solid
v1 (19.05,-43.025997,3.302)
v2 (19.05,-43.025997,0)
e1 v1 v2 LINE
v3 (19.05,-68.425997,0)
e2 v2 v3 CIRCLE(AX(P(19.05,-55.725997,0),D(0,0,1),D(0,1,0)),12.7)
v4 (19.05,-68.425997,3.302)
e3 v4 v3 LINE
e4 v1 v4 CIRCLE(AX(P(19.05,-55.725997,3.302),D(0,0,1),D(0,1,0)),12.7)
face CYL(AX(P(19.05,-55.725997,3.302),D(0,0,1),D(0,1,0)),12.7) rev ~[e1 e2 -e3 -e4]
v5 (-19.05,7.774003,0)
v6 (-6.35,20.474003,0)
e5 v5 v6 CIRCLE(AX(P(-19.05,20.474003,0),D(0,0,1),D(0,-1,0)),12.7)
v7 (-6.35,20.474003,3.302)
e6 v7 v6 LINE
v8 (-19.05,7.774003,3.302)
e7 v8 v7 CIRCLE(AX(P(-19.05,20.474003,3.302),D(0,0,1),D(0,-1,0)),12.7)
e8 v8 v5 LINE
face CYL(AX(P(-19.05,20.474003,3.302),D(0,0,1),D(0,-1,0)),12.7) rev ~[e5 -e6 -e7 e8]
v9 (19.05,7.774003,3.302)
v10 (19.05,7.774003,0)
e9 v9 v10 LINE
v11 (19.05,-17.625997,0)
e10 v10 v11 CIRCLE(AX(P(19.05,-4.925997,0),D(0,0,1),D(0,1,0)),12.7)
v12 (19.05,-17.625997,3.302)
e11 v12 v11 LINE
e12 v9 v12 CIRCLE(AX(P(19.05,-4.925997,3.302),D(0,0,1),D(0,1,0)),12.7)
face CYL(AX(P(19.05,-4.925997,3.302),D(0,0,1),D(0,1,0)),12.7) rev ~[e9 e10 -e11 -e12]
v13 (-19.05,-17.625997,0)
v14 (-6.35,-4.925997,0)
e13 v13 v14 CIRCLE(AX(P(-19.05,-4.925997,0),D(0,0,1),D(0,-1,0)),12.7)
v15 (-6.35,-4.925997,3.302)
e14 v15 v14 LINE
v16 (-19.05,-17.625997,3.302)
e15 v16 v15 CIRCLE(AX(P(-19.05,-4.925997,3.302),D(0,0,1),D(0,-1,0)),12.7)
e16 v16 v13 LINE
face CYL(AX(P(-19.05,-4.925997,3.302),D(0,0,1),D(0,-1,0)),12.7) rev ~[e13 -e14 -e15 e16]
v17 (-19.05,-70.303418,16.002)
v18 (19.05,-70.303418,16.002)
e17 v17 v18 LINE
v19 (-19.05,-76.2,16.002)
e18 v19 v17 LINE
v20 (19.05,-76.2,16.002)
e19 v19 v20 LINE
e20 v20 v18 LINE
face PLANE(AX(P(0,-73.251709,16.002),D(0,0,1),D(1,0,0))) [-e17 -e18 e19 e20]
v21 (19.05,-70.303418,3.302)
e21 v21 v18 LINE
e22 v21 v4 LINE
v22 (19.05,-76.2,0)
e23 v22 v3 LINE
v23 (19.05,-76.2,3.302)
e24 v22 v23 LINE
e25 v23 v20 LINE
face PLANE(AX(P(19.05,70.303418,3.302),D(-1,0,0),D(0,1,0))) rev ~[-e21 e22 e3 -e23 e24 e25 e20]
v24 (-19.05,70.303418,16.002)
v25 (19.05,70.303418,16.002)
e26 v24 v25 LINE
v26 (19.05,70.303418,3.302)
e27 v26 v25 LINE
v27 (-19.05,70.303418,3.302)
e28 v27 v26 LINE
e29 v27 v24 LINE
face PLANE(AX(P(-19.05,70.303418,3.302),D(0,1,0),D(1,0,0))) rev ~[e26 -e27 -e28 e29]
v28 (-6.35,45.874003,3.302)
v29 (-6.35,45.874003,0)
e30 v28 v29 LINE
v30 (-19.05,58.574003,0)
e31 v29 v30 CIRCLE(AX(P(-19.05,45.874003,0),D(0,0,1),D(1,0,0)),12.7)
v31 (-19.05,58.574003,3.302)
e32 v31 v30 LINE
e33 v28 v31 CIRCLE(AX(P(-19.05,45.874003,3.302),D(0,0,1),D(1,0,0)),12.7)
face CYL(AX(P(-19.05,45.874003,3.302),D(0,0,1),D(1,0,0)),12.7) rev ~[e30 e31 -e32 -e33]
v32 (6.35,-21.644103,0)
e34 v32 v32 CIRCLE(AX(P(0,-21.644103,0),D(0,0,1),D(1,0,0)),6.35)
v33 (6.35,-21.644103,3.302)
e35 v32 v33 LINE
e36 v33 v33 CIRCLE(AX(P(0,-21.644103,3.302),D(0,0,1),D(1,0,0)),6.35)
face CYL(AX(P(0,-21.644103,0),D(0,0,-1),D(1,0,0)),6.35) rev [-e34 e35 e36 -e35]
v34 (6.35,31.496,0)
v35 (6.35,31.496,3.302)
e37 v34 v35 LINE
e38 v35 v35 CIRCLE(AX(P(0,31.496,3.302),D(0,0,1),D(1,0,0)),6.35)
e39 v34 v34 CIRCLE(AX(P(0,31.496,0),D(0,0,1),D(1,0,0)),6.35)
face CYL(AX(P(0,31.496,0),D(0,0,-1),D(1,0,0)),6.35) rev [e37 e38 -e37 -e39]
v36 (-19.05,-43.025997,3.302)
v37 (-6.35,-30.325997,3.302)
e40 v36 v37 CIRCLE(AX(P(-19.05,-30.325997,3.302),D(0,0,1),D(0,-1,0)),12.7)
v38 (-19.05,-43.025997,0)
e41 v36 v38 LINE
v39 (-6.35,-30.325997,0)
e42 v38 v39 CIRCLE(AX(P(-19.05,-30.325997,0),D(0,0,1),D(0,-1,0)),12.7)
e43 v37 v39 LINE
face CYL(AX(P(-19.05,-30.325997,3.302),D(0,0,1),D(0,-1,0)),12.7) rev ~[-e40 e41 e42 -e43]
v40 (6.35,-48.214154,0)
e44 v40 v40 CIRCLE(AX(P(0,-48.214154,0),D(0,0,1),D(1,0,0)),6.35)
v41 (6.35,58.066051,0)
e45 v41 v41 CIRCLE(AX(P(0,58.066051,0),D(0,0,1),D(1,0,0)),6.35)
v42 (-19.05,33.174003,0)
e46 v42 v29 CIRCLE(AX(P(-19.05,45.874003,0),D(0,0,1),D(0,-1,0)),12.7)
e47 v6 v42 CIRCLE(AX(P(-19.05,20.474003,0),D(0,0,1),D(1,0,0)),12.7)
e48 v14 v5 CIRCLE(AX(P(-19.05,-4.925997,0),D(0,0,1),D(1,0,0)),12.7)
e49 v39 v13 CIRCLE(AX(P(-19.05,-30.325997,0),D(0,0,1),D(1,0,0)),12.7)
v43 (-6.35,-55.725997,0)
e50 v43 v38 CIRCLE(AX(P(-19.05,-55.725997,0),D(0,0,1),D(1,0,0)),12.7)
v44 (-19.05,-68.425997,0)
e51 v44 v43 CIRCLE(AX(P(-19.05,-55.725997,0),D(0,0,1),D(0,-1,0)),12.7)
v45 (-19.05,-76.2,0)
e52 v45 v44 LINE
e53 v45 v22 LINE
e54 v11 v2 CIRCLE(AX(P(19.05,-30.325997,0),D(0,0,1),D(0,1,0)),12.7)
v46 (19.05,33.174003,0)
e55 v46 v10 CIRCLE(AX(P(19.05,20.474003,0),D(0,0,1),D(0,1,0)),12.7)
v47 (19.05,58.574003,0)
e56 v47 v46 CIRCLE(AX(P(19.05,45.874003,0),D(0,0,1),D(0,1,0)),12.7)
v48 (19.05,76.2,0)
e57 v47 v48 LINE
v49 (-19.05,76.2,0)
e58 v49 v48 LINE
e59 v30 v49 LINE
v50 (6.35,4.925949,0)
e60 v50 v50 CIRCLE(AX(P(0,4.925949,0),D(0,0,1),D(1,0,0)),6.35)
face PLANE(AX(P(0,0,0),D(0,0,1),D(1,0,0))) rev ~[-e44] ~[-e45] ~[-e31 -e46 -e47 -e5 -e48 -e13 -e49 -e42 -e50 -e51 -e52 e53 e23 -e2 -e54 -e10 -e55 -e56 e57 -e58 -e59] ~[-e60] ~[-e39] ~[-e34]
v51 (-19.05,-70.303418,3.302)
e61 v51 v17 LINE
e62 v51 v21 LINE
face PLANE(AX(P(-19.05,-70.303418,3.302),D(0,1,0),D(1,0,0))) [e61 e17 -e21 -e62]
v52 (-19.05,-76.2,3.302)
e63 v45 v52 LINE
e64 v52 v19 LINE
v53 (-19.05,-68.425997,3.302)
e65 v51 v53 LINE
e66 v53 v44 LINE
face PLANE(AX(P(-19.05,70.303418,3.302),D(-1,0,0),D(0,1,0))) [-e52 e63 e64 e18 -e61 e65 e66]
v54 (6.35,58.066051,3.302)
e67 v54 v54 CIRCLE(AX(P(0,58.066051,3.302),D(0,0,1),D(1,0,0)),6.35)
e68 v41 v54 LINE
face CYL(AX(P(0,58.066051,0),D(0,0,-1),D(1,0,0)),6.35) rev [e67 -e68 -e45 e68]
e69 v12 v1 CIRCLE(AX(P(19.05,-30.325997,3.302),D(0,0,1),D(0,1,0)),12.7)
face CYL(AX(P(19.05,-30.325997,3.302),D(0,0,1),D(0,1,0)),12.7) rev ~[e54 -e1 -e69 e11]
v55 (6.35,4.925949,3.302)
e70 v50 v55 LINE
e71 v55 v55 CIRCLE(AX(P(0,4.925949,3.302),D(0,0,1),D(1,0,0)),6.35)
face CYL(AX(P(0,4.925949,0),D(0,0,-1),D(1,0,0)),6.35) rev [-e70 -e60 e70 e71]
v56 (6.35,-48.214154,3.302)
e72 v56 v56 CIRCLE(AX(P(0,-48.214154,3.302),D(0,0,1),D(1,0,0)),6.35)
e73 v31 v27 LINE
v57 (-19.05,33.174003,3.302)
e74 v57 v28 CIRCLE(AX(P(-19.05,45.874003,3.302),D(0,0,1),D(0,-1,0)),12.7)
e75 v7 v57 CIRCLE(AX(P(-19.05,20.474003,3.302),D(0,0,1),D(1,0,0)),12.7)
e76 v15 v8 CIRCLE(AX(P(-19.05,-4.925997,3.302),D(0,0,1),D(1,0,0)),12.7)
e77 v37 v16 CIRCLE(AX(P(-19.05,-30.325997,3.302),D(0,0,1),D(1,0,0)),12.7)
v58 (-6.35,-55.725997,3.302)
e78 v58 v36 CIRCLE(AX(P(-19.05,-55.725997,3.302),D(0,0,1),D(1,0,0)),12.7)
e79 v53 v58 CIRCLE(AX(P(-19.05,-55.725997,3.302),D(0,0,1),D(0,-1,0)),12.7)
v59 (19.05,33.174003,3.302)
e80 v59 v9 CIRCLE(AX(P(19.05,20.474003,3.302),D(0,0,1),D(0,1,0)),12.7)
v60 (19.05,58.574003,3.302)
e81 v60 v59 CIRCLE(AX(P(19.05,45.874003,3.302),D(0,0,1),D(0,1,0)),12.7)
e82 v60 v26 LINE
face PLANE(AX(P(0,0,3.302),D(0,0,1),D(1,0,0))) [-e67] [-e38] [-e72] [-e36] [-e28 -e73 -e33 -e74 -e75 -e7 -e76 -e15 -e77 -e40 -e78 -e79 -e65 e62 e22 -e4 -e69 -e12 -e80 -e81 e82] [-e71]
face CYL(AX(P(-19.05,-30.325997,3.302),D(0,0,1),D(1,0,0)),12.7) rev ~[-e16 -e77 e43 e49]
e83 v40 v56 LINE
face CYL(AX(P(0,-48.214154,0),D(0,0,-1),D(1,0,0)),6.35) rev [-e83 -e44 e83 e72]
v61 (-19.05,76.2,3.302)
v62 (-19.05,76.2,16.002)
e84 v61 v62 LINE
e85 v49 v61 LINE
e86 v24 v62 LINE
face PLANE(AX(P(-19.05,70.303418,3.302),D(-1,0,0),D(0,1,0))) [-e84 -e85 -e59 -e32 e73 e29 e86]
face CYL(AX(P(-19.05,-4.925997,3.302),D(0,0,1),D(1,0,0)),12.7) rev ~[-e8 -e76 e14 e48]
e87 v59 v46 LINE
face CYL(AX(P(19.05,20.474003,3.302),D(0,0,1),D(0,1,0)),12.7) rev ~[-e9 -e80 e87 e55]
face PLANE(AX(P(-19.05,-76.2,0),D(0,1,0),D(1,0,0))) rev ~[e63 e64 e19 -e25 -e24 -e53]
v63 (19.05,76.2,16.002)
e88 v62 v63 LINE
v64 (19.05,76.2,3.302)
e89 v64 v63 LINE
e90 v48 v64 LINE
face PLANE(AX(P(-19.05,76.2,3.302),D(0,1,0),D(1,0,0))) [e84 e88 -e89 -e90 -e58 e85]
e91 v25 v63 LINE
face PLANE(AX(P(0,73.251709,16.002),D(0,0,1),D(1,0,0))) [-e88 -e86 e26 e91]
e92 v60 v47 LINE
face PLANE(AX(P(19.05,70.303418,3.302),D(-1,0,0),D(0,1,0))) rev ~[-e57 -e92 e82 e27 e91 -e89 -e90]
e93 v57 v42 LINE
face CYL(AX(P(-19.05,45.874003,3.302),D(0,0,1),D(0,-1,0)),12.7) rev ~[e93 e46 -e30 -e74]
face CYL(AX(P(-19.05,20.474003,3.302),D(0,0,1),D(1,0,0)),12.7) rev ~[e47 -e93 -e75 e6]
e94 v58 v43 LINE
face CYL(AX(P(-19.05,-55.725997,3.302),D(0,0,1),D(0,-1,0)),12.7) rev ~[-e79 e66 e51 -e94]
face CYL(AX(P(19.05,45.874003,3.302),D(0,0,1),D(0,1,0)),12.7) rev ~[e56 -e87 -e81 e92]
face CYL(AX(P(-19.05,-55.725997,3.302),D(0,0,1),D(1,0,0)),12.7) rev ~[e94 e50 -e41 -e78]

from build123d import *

# Parameters (mm, degrees)
F0_W     = 38.1
F0_H     = 152.4
F0_R     = 6.35
F1_DEPTH = 3.302
F2_W     = 38.1
F2_H     = 5.8965822577
F3_DEPTH = 12.7
F5_DEPTH = 25.4


with BuildPart() as f1:
    # F0 (on Top) → F1 (new body)
    with BuildSketch(Plane.XY):
        Rectangle(F0_W, F0_H)
        with Locations((0, -48.2141543601)):
            Circle(F0_R, mode=Mode.SUBTRACT)
        with Locations((0, -21.6441029067)):
            Circle(F0_R, mode=Mode.SUBTRACT)
        with Locations((0, 4.9259485466)):
            Circle(F0_R, mode=Mode.SUBTRACT)
        with Locations((0, 31.496)):
            Circle(F0_R, mode=Mode.SUBTRACT)
        with Locations((0, 58.0660514534)):
            Circle(F0_R, mode=Mode.SUBTRACT)
    extrude(amount=F1_DEPTH)

    # F2 (on face) → F3 (join)
    with BuildSketch(Plane.XY.offset(3.302)):
        with Locations((0, 73.2517088711)):
            Rectangle(F2_W, F2_H)
        with Locations((0, -73.2517088711)):
            Rectangle(F2_W, F2_H)
    extrude(amount=F3_DEPTH)

    # F4 (on face) → F5 (cut)
    with BuildSketch(Plane.XY.offset(3.302)):
        with BuildLine():
            ThreePointArc((-19.05, 33.1740033209), (-10.0697438789, 36.8937471999), (-6.35, 45.8740033209))
            ThreePointArc((-6.35, 45.8740033209), (-10.0697438789, 54.854259442), (-19.05, 58.5740033209))
            Line((-19.05, 58.5740033209), (-19.05, 33.1740033209))
        make_face()
        with BuildLine():
            ThreePointArc((-6.35, 20.4740033209), (-10.0697438789, 29.454259442), (-19.05, 33.1740033209))
            Line((-19.05, 33.1740033209), (-19.05, 7.7740033209))
            ThreePointArc((-19.05, 7.7740033209), (-10.0697438789, 11.4937471999), (-6.35, 20.4740033209))
        make_face()
        with BuildLine():
            ThreePointArc((-6.35, -4.9259966791), (-10.0697438789, 4.054259442), (-19.05, 7.7740033209))
            Line((-19.05, 7.7740033209), (-19.05, -17.6259966791))
            ThreePointArc((-19.05, -17.6259966791), (-10.0697438789, -13.9062528001), (-6.35, -4.9259966791))
        make_face()
        with BuildLine():
            ThreePointArc((-6.35, -30.3259966791), (-10.0697438789, -21.345740558), (-19.05, -17.6259966791))
            Line((-19.05, -17.6259966791), (-19.05, -43.0259966791))
            ThreePointArc((-19.05, -43.0259966791), (-10.0697438789, -39.3062528001), (-6.35, -30.3259966791))
        make_face()
        with BuildLine():
            Line((19.05, 33.1740033209), (19.05, 58.5740033209))
            ThreePointArc((19.05, 58.5740033209), (6.35, 45.8740033209), (19.05, 33.1740033209))
        make_face()
        with BuildLine():
            ThreePointArc((-6.35, -55.7259966791), (-10.0697438789, -46.745740558), (-19.05, -43.0259966791))
            Line((-19.05, -43.0259966791), (-19.05, -68.4259966791))
            ThreePointArc((-19.05, -68.4259966791), (-10.0697438789, -64.7062528001), (-6.35, -55.7259966791))
        make_face()
        with BuildLine():
            Line((19.05, 7.7740033209), (19.05, 33.1740033209))
            ThreePointArc((19.05, 33.1740033209), (6.35, 20.4740033209), (19.05, 7.7740033209))
        make_face()
        with BuildLine():
            Line((19.05, -17.6259966791), (19.05, 7.7740033209))
            ThreePointArc((19.05, 7.7740033209), (6.35, -4.9259966791), (19.05, -17.6259966791))
        make_face()
        with BuildLine():
            Line((19.05, -43.0259966791), (19.05, -17.6259966791))
            ThreePointArc((19.05, -17.6259966791), (6.35, -30.3259966791), (19.05, -43.0259966791))
        make_face()
        with BuildLine():
            Line((19.05, -68.4259966791), (19.05, -43.0259966791))
            ThreePointArc((19.05, -43.0259966791), (6.35, -55.7259966791), (19.05, -68.4259966791))
        make_face()
    extrude(amount=-F5_DEPTH, mode=Mode.SUBTRACT)


solid = f1.part
